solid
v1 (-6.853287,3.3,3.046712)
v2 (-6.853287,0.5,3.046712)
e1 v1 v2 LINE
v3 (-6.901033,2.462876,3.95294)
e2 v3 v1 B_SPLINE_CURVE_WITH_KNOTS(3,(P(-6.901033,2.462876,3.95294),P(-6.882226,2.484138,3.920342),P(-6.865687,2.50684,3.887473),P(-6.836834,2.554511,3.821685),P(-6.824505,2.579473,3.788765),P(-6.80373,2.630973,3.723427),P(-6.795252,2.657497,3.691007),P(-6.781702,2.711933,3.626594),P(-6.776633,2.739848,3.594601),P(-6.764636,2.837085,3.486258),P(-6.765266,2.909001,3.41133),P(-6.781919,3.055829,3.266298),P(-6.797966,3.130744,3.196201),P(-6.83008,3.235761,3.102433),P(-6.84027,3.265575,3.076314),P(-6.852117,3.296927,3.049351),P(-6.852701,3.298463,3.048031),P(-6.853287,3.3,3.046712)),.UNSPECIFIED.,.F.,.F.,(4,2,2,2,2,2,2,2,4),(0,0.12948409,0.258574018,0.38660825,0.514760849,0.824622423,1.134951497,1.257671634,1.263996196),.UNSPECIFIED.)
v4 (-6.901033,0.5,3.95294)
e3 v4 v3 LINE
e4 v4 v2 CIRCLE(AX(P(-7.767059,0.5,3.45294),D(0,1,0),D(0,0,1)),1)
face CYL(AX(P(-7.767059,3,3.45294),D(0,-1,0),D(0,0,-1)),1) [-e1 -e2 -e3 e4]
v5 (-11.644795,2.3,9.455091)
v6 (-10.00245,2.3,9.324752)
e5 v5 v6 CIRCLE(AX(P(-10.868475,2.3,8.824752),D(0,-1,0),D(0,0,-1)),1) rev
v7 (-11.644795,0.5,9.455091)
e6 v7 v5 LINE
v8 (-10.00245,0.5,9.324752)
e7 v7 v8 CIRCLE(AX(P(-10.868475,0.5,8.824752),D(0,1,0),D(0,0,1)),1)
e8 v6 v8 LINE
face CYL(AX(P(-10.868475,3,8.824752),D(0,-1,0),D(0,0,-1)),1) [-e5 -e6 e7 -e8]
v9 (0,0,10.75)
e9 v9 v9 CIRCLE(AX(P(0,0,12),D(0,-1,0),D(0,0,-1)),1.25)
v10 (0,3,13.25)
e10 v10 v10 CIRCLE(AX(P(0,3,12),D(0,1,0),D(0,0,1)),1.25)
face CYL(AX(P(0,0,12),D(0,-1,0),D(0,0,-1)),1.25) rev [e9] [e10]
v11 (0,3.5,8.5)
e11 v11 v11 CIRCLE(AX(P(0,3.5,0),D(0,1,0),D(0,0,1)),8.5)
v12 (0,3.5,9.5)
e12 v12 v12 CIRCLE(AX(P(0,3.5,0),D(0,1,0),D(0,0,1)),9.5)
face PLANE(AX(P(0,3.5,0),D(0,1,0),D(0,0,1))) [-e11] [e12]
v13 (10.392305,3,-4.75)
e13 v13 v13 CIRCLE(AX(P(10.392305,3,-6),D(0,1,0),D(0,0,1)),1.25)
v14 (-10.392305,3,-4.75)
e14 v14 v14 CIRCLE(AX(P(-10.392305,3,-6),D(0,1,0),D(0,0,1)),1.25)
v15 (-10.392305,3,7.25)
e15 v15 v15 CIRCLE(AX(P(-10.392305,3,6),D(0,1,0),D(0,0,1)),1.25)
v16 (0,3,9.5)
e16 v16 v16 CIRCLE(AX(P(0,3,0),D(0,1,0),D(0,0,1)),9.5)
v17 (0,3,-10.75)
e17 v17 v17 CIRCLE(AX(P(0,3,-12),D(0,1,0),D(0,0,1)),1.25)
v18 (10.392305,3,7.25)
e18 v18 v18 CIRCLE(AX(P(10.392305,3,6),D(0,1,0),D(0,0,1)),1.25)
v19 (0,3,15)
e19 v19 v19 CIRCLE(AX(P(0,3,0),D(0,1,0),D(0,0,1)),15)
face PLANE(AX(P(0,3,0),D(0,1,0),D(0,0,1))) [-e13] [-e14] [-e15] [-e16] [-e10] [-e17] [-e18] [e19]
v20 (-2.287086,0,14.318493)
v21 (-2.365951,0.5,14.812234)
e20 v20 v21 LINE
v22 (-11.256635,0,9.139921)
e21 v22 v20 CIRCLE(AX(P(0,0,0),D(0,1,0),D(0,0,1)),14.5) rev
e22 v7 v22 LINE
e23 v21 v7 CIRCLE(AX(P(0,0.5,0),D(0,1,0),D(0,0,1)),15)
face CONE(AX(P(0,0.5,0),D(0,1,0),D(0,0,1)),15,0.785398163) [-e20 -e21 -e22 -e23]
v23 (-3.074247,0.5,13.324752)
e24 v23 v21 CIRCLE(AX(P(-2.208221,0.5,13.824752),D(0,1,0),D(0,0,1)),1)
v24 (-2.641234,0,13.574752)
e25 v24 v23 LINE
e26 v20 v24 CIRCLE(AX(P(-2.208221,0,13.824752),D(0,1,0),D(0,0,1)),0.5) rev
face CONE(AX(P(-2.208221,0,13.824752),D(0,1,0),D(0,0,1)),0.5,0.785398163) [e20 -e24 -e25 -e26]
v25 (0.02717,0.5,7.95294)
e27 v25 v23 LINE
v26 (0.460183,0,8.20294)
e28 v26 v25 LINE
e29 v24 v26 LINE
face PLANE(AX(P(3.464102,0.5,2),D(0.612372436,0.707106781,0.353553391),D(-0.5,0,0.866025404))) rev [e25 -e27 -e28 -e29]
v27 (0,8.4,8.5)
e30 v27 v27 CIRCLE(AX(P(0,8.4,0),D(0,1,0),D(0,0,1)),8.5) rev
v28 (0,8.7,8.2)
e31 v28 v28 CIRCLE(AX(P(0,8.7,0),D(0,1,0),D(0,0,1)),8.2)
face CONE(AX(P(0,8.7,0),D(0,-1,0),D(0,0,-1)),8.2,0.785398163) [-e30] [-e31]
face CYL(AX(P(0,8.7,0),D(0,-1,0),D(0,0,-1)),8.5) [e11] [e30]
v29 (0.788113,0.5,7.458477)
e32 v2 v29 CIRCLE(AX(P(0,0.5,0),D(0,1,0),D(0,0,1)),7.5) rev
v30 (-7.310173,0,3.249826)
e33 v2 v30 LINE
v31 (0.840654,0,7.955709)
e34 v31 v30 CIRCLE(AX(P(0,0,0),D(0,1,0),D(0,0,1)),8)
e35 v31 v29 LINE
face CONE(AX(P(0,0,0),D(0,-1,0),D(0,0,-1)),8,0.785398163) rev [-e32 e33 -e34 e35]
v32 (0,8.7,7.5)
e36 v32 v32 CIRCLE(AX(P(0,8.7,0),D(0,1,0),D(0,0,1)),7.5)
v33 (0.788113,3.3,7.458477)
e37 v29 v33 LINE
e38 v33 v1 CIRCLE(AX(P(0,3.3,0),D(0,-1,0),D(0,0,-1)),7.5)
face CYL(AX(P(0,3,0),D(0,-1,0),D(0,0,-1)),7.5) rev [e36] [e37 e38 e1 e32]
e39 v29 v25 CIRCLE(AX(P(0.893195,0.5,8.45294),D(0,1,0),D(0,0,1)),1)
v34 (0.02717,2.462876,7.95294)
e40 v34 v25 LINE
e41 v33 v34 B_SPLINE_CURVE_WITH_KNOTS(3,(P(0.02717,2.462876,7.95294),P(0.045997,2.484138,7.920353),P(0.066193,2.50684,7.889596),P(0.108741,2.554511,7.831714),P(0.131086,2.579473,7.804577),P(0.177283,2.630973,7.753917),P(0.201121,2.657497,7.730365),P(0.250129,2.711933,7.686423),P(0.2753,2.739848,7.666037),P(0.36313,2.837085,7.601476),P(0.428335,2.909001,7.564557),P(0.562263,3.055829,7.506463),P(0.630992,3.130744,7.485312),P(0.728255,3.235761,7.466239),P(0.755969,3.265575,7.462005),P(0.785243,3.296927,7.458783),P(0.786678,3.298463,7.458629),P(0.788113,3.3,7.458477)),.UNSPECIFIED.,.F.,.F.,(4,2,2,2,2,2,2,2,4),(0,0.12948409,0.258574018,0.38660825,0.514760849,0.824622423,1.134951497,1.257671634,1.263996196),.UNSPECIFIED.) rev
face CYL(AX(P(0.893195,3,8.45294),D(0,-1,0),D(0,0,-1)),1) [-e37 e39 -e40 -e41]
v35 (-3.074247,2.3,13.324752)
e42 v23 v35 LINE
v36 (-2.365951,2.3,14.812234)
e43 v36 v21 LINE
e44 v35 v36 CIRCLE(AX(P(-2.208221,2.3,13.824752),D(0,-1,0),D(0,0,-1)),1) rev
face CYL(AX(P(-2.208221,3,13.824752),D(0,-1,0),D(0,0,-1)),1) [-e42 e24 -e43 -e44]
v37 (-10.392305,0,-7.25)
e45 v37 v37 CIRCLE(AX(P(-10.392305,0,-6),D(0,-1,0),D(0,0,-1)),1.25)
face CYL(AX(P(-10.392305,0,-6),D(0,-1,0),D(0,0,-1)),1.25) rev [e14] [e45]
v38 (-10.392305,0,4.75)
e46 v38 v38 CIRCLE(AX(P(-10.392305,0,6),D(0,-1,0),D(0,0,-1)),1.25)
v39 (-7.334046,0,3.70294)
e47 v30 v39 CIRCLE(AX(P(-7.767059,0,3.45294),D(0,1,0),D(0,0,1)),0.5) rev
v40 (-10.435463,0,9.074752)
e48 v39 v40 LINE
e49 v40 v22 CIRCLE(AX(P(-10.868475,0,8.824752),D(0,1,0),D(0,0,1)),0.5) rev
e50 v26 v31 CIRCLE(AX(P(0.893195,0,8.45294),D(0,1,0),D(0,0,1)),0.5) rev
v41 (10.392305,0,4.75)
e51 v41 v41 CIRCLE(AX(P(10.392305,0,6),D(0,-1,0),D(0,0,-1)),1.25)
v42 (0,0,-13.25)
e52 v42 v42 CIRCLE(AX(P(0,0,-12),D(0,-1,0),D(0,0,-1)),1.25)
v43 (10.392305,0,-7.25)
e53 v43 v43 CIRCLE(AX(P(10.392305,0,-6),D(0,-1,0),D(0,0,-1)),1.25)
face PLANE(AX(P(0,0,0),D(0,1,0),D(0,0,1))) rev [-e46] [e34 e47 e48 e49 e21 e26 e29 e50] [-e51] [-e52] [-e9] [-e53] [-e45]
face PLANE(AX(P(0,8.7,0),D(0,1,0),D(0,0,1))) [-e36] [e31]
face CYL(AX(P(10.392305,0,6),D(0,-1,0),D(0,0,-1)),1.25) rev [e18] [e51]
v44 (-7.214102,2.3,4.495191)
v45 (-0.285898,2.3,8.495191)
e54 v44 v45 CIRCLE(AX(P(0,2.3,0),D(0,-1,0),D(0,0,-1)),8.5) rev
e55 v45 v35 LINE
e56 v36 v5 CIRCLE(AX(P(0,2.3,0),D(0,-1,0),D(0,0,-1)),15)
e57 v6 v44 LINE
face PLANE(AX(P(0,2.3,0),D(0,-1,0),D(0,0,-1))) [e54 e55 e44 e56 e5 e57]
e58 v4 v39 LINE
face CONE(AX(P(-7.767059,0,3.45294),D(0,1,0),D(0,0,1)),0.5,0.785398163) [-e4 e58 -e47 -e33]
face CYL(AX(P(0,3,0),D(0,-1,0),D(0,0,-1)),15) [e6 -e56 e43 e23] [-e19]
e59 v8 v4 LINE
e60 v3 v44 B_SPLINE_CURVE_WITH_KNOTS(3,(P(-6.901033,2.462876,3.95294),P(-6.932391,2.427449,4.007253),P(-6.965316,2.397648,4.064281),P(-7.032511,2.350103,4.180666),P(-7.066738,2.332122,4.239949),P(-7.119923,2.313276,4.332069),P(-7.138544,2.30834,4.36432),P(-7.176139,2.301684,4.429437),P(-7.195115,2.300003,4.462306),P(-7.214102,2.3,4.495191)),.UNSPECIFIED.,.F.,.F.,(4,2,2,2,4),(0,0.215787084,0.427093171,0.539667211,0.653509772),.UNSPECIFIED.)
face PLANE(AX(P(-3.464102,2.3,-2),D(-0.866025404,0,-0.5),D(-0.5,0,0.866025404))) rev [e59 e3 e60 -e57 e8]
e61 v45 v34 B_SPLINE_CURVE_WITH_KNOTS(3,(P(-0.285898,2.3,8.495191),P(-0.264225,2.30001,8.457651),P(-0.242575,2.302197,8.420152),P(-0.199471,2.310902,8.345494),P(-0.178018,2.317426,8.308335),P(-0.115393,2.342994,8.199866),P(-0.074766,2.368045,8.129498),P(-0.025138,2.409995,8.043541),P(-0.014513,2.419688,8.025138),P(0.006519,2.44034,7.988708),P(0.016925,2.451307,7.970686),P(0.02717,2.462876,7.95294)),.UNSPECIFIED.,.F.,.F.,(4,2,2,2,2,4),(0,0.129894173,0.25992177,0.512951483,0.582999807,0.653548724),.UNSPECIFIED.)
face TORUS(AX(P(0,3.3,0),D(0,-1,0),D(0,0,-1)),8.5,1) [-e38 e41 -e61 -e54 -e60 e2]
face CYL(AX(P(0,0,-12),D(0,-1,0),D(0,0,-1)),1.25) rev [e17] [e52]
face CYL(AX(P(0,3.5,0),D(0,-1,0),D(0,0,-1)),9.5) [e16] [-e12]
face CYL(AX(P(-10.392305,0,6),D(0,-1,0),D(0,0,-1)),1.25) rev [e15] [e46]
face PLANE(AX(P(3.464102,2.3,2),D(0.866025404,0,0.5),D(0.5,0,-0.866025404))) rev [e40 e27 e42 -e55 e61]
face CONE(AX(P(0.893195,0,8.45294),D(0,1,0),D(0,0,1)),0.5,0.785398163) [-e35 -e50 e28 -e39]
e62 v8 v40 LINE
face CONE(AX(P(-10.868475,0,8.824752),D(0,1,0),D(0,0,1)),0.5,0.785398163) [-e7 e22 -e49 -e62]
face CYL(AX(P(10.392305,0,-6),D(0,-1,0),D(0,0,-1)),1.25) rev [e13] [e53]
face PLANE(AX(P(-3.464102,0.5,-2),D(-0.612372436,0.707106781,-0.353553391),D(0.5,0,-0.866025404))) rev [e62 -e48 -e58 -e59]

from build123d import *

# Parameters (mm, degrees)
SKETCH_1_R          = 15
SKETCH_1_R_2        = 7.5
SKETCH_1_R_3        = 1
EXTRUDE_1_DEPTH     = 3
SKETCH_2_R          = 8.5
SKETCH_2_R_2        = 7.5
EXTRUDE_2_DEPTH     = 5.7
SKETCH_3_R          = 9.5
SKETCH_3_R_2        = 8.5
EXTRUDE_3_DEPTH     = 0.5
HOLE_WIZARD_M3_1_D  = 2.5
CHAMFER_2_SIZE      = 0.3
CUT_EXTRUDE_2_DEPTH = 2.3
FILLET_2_R          = 1
CHAMFER_3_SIZE      = 0.5


with BuildPart() as part:
    # 草图1 → 凸台-拉伸1 (new body)
    with BuildSketch(Plane(origin=(0, 0, 0), x_dir=(1, 0, 0), z_dir=(0, 1, 0))):
        Circle(SKETCH_1_R)
        Circle(SKETCH_1_R_2, mode=Mode.SUBTRACT)
        with Locations((0, 12)):
            Circle(SKETCH_1_R_3, mode=Mode.SUBTRACT)
        with Locations((10.392304845, 6)):
            Circle(SKETCH_1_R_3, mode=Mode.SUBTRACT)
        with Locations((10.392304845, -6)):
            Circle(SKETCH_1_R_3, mode=Mode.SUBTRACT)
        with Locations((0, -12)):
            Circle(SKETCH_1_R_3, mode=Mode.SUBTRACT)
        with Locations((-10.392304845, -6)):
            Circle(SKETCH_1_R_3, mode=Mode.SUBTRACT)
        with Locations((-10.392304845, 6)):
            Circle(SKETCH_1_R_3, mode=Mode.SUBTRACT)
    extrude(amount=EXTRUDE_1_DEPTH)

    # 草图2 → 凸台-拉伸2 (add)
    with BuildSketch(Plane(origin=(0, 3, 0), x_dir=(1, 0, 0), z_dir=(0, 1, 0))):
        Circle(SKETCH_2_R)
        Circle(SKETCH_2_R_2, mode=Mode.SUBTRACT)
    extrude(amount=EXTRUDE_2_DEPTH)

    # 草图3 → 凸台-拉伸3 (add)
    with BuildSketch(Plane(origin=(0, 3, 0), x_dir=(1, 0, 0), z_dir=(0, 1, 0))):
        Circle(SKETCH_3_R)
        Circle(SKETCH_3_R_2, mode=Mode.SUBTRACT)
    extrude(amount=EXTRUDE_3_DEPTH)

    # M3 螺纹孔1 (through all)
    with Locations(Plane(origin=(0, 0, 0), x_dir=(-1, 0, 0), z_dir=(0, -1, 0))):
        with Locations((0, 12), (10.392304845, 6), (10.392304845, -6), (0, -12), (-10.392304845, -6), (-10.392304845, 6)):
            Hole(HOLE_WIZARD_M3_1_D / 2)

    # 倒角2
    chamfer_2_edges = [part.edges().sort_by_distance(p)[0] for p in [
        (-8.5, 8.7, 0),
    ]]
    chamfer(chamfer_2_edges, length=CHAMFER_2_SIZE)

    # 草图7 → 切除-拉伸2 (cut)
    with BuildSketch(Plane.XZ):
        with BuildLine():
            Line((-3.464101615, -2), (-12.464101615, 13.588457268))
            ThreePointArc((-12.464101615, 13.588457268), (-11, 19.052558883), (-5.535898385, 17.588457268))
            Line((-5.535898385, 17.588457268), (3.464101615, 2))
            ThreePointArc((3.464101615, 2), (2, -3.464101615), (-3.464101615, -2))
        make_face()
    extrude(amount=-CUT_EXTRUDE_2_DEPTH, mode=Mode.SUBTRACT)

    # 圆角2
    fillet_2_edges = [part.edges().sort_by_distance(p)[0] for p in [
        (-3.75, 2.3, 6.495190528),
        (0.29195723, 1.15, 7.494315244),
        (-6.636246, 1.15, 3.494315244),
        (-3.764314532, 1.15, 14.519984026),
        (-10.692517763, 1.15, 10.519984026),
    ]]
    fillet(fillet_2_edges, radius=FILLET_2_R)

    # 倒角3
    chamfer_3_edges = [part.edges().sort_by_distance(p)[0] for p in [
        (-1.557296735, 0, -7.336540525),
        (0.348322918, 0, 7.614421432),
        (-6.768443854, 0, 3.50555422),
        (-1.523538478, 0, 10.638846051),
        (-8.451741708, 0, 6.638846051),
        (-3.111088885, 0, 14.254670597),
        (-10.789362417, 0, 9.821617306),
        (-5.016376849, 0, -14.136334861),
    ]]
    chamfer(chamfer_3_edges, length=CHAMFER_3_SIZE)


solid = part.part
